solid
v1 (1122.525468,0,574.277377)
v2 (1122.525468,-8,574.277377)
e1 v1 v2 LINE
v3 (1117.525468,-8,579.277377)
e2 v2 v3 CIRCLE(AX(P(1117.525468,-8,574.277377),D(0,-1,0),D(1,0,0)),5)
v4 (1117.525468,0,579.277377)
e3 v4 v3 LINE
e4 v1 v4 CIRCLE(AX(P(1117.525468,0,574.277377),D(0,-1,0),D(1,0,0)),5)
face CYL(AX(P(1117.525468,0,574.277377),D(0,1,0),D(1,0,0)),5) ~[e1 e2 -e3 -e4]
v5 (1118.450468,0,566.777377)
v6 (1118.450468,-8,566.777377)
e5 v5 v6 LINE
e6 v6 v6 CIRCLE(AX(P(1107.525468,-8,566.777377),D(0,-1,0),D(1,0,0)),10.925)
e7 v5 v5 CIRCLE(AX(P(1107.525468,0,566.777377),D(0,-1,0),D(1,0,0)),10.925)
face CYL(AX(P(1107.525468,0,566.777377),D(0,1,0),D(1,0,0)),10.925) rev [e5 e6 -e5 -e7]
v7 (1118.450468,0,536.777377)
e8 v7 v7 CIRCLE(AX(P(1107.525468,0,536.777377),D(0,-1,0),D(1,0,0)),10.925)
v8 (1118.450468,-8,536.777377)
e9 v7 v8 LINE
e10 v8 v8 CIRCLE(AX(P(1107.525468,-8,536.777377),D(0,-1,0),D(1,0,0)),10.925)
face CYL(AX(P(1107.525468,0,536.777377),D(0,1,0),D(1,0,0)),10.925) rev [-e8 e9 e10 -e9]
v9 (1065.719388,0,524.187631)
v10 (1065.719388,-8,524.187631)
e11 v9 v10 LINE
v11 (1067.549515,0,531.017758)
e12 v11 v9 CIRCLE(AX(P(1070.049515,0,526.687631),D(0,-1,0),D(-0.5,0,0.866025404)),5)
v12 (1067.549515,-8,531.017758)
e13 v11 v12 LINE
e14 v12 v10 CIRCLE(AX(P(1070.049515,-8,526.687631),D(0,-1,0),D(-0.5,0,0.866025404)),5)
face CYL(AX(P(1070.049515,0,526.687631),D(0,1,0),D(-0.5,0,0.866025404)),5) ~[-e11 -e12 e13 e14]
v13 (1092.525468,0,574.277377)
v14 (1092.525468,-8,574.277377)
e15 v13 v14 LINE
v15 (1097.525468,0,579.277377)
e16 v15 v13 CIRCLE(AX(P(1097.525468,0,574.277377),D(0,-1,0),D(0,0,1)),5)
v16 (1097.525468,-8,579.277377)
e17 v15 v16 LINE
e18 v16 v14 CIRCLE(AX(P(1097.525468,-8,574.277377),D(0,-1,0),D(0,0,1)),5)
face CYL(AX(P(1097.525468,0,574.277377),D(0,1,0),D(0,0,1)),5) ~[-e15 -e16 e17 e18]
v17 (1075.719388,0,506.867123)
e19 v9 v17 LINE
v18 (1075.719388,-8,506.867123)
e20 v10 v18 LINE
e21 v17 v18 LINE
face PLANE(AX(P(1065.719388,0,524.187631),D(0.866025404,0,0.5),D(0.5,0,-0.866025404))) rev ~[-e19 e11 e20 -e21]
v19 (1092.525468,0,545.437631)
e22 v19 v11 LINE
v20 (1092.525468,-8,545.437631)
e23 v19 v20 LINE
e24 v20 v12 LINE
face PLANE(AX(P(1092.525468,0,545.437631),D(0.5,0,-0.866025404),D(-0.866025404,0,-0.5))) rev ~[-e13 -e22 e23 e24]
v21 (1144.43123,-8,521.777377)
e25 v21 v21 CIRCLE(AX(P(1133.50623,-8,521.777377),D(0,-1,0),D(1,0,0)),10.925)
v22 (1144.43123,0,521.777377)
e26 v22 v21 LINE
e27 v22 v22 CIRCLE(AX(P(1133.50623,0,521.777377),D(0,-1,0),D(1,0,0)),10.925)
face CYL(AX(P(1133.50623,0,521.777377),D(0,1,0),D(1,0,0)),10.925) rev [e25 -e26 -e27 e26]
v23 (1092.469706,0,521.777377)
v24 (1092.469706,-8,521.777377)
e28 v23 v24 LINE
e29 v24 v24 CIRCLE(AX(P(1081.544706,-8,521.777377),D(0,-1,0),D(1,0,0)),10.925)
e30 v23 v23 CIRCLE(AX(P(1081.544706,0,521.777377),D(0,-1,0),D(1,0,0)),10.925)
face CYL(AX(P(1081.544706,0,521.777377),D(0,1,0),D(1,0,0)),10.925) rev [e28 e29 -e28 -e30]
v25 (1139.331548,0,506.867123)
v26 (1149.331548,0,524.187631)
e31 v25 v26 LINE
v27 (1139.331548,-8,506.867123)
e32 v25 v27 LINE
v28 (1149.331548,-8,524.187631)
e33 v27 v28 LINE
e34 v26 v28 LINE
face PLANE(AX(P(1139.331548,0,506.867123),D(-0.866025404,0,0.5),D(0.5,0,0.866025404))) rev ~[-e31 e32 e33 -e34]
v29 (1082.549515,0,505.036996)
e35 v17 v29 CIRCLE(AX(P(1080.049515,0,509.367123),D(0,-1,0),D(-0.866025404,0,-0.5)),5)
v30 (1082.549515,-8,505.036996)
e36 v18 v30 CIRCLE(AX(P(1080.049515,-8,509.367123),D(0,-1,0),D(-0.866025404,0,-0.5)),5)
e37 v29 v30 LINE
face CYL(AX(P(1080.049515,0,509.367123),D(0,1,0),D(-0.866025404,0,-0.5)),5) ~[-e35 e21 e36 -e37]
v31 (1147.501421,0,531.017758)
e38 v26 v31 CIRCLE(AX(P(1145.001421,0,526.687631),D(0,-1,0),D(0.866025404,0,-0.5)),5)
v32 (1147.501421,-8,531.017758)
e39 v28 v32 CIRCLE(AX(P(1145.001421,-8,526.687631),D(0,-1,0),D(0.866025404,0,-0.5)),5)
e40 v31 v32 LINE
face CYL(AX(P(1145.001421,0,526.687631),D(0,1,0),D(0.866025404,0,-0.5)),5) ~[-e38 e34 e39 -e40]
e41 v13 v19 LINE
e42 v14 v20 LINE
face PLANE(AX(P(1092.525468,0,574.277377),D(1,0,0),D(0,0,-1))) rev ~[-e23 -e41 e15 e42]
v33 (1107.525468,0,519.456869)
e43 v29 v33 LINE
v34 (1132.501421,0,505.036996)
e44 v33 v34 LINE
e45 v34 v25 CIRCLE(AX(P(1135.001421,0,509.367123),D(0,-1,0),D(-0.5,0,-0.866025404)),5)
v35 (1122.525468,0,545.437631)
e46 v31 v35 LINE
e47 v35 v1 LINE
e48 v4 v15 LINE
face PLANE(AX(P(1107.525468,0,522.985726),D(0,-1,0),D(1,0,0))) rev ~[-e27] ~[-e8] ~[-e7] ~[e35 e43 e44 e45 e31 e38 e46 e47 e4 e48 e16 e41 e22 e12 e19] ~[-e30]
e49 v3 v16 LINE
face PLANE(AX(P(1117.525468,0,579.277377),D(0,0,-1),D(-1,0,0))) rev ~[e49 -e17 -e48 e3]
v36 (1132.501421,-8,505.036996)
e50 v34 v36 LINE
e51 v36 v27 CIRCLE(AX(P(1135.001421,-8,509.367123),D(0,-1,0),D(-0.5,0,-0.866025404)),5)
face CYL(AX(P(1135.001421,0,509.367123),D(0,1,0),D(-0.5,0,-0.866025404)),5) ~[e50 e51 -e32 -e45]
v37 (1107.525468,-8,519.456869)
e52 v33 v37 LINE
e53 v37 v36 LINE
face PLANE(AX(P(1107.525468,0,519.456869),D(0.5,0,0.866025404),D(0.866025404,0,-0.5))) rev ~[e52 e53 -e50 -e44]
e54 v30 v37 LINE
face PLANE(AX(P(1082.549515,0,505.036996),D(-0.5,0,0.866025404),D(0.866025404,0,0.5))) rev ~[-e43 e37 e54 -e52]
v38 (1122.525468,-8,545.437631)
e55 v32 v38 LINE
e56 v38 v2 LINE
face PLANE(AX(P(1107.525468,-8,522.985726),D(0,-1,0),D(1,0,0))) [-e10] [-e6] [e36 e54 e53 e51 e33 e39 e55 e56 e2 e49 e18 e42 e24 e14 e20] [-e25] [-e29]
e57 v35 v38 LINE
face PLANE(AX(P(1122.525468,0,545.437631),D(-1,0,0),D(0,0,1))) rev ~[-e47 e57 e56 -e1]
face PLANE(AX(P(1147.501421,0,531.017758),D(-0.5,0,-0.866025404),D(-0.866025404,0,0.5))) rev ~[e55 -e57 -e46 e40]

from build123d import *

# Parameters (mm, degrees)
F0_R     = 10.925
F1_DEPTH = 8


with BuildPart() as f1:
    # F0 (on Front) → F1 (new body)
    with BuildSketch(Plane.XZ):
        Polygon((1107.5254678726, 519.4568690529), (1115.874832778, 524.2773771286), (1099.1761029672, 524.2773771286), align=None)
        Polygon((1114.1761029672, 550.2581392421), (1122.5254678726, 535.7966150151), (1122.5254678726, 545.4376311664), align=None)
        Polygon((1092.5254678726, 545.4376311664), (1092.5254678726, 535.7966150151), (1100.874832778, 550.2581392421), align=None)
        with BuildLine():
            Line((1114.1761029672, 550.2581392421), (1122.5254678726, 545.4376311664))
            Line((1122.5254678726, 545.4376311664), (1122.5254678726, 574.2773771286))
            ThreePointArc((1122.5254678726, 574.2773771286), (1121.0610017786, 577.8129110345), (1117.5254678726, 579.2773771286))
            Line((1117.5254678726, 579.2773771286), (1097.5254678726, 579.2773771286))
            ThreePointArc((1097.5254678726, 579.2773771286), (1093.9899339667, 577.8129110345), (1092.5254678726, 574.2773771286))
            Line((1092.5254678726, 574.2773771286), (1092.5254678726, 545.4376311664))
            Line((1092.5254678726, 545.4376311664), (1100.874832778, 550.2581392421))
            Line((1100.874832778, 550.2581392421), (1104.2001503253, 556.0177581854))
            Line((1104.2001503253, 556.0177581854), (1107.5254678726, 554.0978852043))
            Line((1107.5254678726, 554.0978852043), (1110.8507854199, 556.0177581854))
            Line((1110.8507854199, 556.0177581854), (1114.1761029672, 550.2581392421))
        make_face()
        with Locations((1107.5254678726, 566.7773771286)):
            Circle(F0_R, mode=Mode.SUBTRACT)
        with BuildLine():
            Line((1107.5254678726, 519.4568690529), (1099.1761029672, 524.2773771286))
            Line((1099.1761029672, 524.2773771286), (1092.5254678726, 524.2773771286))
            Line((1092.5254678726, 524.2773771286), (1092.5254678726, 528.1171230908))
            Line((1092.5254678726, 528.1171230908), (1089.2001503253, 530.0369960718))
            Line((1089.2001503253, 530.0369960718), (1092.5254678726, 535.7966150151))
            Line((1092.5254678726, 535.7966150151), (1092.5254678726, 545.4376311664))
            Line((1092.5254678726, 545.4376311664), (1067.5495152307, 531.0177581854))
            ThreePointArc((1067.5495152307, 531.0177581854), (1065.2198860993, 527.981726392), (1065.7193882118, 524.1876311664))
            Line((1065.7193882118, 524.1876311664), (1075.7193882118, 506.8671230908))
            ThreePointArc((1075.7193882118, 506.8671230908), (1078.7554200052, 504.5374939593), (1082.5495152307, 505.0369960718))
            Line((1082.5495152307, 505.0369960718), (1107.5254678726, 519.4568690529))
        make_face()
        with Locations((1081.5447057591, 521.7773771286)):
            Circle(F0_R, mode=Mode.SUBTRACT)
        Polygon((1099.1761029672, 524.2773771286), (1115.874832778, 524.2773771286), (1122.5254678726, 528.1171230908), (1122.5254678726, 535.7966150151), (1114.1761029672, 550.2581392421), (1107.5254678726, 554.0978852043), (1100.874832778, 550.2581392421), (1092.5254678726, 535.7966150151), (1092.5254678726, 528.1171230908), align=None)
        with Locations((1107.5254678726, 536.7773771286)):
            Circle(F0_R, mode=Mode.SUBTRACT)
        Polygon((1100.874832778, 550.2581392421), (1107.5254678726, 554.0978852043), (1104.2001503253, 556.0177581854), align=None)
        Polygon((1107.5254678726, 554.0978852043), (1114.1761029672, 550.2581392421), (1110.8507854199, 556.0177581854), align=None)
        Polygon((1115.874832778, 524.2773771286), (1122.5254678726, 524.2773771286), (1122.5254678726, 528.1171230908), align=None)
        Polygon((1089.2001503253, 530.0369960718), (1092.5254678726, 528.1171230908), (1092.5254678726, 535.7966150151), align=None)
        Polygon((1092.5254678726, 524.2773771286), (1099.1761029672, 524.2773771286), (1092.5254678726, 528.1171230908), align=None)
        with BuildLine():
            Line((1122.5254678726, 528.1171230908), (1122.5254678726, 524.2773771286))
            Line((1122.5254678726, 524.2773771286), (1115.874832778, 524.2773771286))
            Line((1115.874832778, 524.2773771286), (1107.5254678726, 519.4568690529))
            Line((1107.5254678726, 519.4568690529), (1132.5014205145, 505.0369960718))
            ThreePointArc((1132.5014205145, 505.0369960718), (1136.29551574, 504.5374939593), (1139.3315475335, 506.8671230908))
            Line((1139.3315475335, 506.8671230908), (1149.3315475335, 524.1876311664))
            ThreePointArc((1149.3315475335, 524.1876311664), (1149.831049646, 527.981726392), (1147.5014205145, 531.0177581854))
            Line((1147.5014205145, 531.0177581854), (1122.5254678726, 545.4376311664))
            Line((1122.5254678726, 545.4376311664), (1122.5254678726, 535.7966150151))
            Line((1122.5254678726, 535.7966150151), (1125.8507854199, 530.0369960718))
            Line((1125.8507854199, 530.0369960718), (1122.5254678726, 528.1171230908))
        make_face()
        with Locations((1133.5062299862, 521.7773771286)):
            Circle(F0_R, mode=Mode.SUBTRACT)
        Polygon((1122.5254678726, 535.7966150151), (1122.5254678726, 528.1171230908), (1125.8507854199, 530.0369960718), align=None)
    extrude(amount=F1_DEPTH)


solid = f1.part
